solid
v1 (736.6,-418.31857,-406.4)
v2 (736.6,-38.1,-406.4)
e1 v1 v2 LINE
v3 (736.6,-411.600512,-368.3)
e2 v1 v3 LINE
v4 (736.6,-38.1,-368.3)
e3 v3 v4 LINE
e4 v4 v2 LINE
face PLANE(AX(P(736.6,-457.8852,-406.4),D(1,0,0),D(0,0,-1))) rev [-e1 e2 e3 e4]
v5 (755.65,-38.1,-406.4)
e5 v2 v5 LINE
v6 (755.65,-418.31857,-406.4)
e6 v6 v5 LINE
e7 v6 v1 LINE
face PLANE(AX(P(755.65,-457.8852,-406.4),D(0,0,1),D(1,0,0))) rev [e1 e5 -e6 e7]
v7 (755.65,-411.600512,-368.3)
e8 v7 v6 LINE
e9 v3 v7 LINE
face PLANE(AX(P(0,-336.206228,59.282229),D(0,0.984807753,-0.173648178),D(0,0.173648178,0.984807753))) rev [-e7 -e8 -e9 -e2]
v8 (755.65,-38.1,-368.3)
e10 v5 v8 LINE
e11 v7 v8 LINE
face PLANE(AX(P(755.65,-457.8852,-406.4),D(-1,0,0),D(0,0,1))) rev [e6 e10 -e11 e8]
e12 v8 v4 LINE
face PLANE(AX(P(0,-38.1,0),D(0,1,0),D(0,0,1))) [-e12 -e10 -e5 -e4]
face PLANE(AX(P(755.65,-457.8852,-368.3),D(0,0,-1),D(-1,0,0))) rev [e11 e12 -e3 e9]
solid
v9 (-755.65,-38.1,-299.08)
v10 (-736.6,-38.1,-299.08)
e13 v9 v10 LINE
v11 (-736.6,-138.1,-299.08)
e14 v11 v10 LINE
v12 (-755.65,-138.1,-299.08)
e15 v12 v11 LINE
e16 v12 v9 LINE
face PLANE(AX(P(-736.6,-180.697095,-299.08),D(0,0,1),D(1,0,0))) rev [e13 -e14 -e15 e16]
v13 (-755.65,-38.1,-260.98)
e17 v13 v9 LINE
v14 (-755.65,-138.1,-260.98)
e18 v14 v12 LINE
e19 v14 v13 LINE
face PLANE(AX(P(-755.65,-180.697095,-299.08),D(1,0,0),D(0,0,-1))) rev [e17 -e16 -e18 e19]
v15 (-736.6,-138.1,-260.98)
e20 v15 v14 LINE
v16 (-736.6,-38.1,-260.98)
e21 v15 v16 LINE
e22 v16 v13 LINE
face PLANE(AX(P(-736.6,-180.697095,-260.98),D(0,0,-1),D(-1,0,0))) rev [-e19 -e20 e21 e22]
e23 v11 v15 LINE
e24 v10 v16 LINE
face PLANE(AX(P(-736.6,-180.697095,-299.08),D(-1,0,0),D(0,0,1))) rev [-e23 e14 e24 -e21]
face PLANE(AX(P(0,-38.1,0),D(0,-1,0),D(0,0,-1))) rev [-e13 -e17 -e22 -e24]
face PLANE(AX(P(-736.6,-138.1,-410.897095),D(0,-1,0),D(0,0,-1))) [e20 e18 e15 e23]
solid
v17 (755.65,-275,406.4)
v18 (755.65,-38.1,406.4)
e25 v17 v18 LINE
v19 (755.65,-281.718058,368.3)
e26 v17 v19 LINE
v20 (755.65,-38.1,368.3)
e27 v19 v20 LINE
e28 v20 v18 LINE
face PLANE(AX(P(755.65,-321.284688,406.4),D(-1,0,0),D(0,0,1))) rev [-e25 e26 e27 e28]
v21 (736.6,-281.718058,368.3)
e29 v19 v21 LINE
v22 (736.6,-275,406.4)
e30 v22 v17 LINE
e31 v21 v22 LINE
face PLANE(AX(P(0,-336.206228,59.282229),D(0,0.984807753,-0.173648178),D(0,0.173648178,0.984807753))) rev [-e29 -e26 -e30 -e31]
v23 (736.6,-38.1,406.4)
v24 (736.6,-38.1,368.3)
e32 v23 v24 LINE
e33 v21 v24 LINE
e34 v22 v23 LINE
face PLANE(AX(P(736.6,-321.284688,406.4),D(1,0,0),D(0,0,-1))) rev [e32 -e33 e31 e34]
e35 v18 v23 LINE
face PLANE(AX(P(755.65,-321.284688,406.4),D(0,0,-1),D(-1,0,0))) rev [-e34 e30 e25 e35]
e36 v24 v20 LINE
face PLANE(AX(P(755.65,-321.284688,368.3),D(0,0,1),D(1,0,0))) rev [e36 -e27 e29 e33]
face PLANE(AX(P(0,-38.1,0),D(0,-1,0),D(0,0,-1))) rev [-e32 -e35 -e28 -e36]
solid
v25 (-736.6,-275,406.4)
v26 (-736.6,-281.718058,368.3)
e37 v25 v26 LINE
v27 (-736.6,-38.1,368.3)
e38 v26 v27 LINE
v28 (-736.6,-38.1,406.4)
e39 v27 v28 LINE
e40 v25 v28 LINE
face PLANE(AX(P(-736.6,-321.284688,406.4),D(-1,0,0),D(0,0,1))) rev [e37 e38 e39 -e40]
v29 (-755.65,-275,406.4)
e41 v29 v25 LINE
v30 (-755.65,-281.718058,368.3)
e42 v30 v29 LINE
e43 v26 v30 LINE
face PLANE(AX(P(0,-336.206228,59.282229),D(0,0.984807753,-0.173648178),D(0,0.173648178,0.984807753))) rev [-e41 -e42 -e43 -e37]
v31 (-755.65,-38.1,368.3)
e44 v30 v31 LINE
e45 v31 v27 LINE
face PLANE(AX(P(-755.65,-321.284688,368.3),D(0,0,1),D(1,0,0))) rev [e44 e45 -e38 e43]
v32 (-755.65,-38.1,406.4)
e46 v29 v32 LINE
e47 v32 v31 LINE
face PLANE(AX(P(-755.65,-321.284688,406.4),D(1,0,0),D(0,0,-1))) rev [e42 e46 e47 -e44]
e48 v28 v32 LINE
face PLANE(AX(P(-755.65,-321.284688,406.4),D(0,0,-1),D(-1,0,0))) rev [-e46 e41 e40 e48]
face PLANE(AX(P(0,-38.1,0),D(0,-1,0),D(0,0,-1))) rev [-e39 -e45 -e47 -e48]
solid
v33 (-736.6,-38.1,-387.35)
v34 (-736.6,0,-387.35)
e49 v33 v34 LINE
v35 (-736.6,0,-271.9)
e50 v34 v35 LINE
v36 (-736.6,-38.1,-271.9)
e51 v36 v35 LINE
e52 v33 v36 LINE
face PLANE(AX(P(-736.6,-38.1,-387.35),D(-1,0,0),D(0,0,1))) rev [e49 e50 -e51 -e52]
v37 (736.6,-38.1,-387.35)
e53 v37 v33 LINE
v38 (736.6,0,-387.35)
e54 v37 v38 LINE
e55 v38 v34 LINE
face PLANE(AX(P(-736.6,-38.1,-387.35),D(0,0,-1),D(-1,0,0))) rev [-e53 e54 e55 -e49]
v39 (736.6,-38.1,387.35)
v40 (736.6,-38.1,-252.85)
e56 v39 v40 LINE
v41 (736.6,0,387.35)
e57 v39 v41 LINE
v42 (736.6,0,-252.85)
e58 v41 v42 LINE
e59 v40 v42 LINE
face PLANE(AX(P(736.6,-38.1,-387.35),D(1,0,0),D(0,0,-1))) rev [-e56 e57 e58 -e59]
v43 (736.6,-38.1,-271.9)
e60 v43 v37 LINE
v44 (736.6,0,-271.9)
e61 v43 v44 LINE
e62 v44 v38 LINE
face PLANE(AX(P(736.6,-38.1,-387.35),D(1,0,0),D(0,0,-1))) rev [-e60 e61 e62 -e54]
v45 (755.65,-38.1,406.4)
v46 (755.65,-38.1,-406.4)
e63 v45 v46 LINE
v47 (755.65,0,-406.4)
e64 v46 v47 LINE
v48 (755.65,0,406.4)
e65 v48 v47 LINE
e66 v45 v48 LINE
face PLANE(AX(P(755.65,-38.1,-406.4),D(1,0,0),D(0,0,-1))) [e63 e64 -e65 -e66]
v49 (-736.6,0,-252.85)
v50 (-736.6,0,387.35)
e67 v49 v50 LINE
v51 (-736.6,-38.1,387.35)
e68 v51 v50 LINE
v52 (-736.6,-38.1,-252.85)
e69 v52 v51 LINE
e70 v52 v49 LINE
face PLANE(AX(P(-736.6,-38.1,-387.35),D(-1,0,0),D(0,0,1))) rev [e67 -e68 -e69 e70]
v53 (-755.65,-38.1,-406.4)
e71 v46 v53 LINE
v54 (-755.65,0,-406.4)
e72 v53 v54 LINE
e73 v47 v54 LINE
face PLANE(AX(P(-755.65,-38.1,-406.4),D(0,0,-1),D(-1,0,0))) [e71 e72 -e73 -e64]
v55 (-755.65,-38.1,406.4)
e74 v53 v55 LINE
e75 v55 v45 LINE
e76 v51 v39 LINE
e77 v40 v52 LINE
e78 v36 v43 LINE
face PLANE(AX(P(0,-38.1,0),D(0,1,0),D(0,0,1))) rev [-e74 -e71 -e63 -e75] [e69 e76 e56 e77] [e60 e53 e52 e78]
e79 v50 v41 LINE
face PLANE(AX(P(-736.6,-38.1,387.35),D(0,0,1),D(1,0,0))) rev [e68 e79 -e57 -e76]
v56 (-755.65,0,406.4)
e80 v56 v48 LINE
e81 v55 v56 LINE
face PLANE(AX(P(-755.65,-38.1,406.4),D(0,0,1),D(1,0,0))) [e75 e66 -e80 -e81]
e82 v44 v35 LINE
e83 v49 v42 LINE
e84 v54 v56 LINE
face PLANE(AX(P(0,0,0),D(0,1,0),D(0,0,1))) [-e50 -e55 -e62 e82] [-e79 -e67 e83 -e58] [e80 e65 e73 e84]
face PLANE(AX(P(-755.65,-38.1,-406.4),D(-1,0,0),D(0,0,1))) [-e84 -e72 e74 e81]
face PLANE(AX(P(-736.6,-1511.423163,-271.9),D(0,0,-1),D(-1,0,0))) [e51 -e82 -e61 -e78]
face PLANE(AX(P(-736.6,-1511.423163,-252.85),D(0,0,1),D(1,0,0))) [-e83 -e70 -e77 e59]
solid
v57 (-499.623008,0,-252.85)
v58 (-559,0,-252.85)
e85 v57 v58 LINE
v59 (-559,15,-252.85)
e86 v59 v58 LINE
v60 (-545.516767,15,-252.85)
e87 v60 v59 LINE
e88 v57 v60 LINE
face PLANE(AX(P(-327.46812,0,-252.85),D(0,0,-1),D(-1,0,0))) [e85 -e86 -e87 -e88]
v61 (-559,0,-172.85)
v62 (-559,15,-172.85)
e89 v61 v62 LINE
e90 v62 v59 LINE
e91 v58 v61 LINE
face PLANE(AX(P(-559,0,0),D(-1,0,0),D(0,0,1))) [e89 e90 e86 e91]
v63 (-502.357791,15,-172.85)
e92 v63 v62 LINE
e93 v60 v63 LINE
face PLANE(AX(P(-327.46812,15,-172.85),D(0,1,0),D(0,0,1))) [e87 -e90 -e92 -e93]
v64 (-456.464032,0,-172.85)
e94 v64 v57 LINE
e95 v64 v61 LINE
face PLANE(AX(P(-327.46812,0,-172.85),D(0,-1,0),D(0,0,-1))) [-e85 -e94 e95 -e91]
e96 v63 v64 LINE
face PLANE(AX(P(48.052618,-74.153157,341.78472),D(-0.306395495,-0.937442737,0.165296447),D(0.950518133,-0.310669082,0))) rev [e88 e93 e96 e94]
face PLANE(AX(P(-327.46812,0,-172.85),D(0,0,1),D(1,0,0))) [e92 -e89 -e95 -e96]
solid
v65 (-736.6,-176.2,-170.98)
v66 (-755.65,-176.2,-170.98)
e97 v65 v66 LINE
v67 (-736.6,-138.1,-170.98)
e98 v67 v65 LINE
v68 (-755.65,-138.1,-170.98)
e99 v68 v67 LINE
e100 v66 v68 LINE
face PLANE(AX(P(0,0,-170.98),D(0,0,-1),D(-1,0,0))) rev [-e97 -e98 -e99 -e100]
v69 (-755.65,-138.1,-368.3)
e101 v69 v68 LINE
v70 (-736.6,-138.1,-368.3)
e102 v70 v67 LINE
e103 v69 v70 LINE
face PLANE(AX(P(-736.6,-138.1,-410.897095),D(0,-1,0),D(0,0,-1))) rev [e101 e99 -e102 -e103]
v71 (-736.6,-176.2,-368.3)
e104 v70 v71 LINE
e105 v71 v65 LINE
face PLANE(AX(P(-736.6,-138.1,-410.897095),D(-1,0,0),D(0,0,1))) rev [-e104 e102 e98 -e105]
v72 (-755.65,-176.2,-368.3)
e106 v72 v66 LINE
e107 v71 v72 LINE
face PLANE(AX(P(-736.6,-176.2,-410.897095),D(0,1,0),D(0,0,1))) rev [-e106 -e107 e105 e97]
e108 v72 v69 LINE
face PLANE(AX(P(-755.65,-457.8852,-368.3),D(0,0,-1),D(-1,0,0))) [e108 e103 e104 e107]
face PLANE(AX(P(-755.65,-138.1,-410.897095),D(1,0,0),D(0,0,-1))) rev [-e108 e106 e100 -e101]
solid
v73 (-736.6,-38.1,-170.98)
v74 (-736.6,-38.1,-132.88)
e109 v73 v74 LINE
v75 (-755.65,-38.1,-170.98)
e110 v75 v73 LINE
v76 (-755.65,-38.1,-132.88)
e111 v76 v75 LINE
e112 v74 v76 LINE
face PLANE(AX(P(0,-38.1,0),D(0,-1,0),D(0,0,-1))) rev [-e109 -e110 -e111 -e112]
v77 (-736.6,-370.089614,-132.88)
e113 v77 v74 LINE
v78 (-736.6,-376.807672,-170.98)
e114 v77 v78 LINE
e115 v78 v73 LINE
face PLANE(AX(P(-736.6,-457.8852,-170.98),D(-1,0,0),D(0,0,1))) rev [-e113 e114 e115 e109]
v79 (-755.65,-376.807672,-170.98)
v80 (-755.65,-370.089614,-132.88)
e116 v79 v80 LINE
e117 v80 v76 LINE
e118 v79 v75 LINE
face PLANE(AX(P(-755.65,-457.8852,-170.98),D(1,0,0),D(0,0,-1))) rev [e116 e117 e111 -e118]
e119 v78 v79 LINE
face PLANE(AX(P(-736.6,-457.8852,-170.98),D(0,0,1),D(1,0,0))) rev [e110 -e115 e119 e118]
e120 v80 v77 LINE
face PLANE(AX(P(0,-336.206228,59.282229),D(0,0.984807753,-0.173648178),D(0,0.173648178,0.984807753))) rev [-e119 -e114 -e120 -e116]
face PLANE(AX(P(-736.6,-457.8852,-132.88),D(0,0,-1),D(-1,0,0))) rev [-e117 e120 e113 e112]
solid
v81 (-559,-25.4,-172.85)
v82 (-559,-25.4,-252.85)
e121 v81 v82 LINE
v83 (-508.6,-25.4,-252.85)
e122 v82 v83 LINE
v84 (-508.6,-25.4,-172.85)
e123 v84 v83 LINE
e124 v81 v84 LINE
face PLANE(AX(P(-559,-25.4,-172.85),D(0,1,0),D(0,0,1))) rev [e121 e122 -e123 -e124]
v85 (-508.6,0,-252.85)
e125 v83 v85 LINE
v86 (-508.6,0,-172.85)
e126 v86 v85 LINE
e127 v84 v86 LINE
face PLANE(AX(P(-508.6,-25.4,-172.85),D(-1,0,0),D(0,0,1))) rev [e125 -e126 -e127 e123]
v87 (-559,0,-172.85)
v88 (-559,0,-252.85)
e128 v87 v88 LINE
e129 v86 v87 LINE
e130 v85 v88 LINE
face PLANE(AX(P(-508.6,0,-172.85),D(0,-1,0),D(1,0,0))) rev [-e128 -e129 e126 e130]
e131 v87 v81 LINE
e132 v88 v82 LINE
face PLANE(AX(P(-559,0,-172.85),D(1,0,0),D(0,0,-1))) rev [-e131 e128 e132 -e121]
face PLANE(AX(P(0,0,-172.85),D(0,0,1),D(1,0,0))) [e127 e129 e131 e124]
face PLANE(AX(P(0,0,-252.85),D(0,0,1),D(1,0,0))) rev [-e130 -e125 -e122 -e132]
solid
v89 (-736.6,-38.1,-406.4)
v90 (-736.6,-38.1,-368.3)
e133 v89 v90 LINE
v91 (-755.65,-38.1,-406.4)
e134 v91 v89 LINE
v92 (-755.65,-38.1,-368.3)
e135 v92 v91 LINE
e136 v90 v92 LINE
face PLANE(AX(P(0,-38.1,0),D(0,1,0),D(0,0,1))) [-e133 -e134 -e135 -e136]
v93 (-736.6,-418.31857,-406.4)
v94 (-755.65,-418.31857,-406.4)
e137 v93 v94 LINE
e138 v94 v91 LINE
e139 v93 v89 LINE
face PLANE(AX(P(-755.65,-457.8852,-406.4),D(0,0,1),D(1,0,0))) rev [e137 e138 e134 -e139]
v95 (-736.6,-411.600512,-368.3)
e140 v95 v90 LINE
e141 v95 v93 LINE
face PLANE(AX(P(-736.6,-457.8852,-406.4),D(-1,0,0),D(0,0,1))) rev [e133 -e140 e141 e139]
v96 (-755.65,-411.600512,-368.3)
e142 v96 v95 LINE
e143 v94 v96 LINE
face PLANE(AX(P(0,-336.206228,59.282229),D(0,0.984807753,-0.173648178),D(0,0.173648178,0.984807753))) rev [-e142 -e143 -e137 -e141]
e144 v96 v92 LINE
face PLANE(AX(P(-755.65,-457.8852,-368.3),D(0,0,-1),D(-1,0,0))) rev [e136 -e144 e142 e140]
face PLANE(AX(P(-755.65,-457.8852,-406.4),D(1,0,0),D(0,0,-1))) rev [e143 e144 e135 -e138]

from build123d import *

# Parameters (mm, degrees)
SKETCH22_W          = 1511.3
SKETCH22_H          = 812.8
SKETCH22_W_2        = 1473.2
SKETCH22_H_2        = 774.7
BOSS_EXTRUDE3_DEPTH = 38.1
BOSS_EXTRUDE4_REACH = 860.848
SKETCH23_W          = 19.05
SKETCH23_H          = 38.1
BOSS_EXTRUDE5_REACH = 893.918
SKETCH24_W          = 19.05
SKETCH24_H          = 38.1
SKETCH26_W          = 1473.2
SKETCH26_H          = 19.05
BOSS_EXTRUDE6_DEPTH = 38.1
SKETCH27_W          = 19.05
SKETCH27_H          = 38.1
BOSS_EXTRUDE7_DEPTH = 197.32
SKETCH29_W          = 19.05
SKETCH29_H          = 38.1
BOSS_EXTRUDE8_DEPTH = 100
SKETCH30_W          = 50.4
SKETCH30_H          = 25.4
BOSS_EXTRUDE9_DEPTH = 80


with BuildPart() as part:
    # Sketch22 → Boss-Extrude3 (new body)
    with BuildSketch(Plane(origin=(0, 0, 0), x_dir=(1, 0, 0), z_dir=(0, 1, 0))):
        Rectangle(SKETCH22_W, SKETCH22_H)
        Rectangle(SKETCH22_W_2, SKETCH22_H_2, mode=Mode.SUBTRACT)
    extrude(amount=-BOSS_EXTRUDE3_DEPTH)

    # Sketch26 → Boss-Extrude6 (add)
    with BuildSketch(Plane(origin=(0, 0, 0), x_dir=(1, 0, 0), z_dir=(0, 1, 0))):
        with Locations((0, 262.375)):
            Rectangle(SKETCH26_W, SKETCH26_H)
    extrude(amount=-BOSS_EXTRUDE6_DEPTH)


with BuildPart() as body_2:
    # Boss-Extrude4: up to this plane
    boss_extrude4_end = Plane(origin=(0, -336.206228482, 59.282229164), z_dir=(0, 0.984807753012208, -0.17364817766693072))
    # Sketch23 → Boss-Extrude4 (new, up to the surface)
    with BuildSketch(Plane.XZ.offset(38.1), mode=Mode.PRIVATE) as boss_extrude4_sk1:
        with Locations((-746.125, 387.35)):
            Rectangle(SKETCH23_W, SKETCH23_H)
    boss_extrude4_tool1 = split(extrude(boss_extrude4_sk1.sketch, amount=BOSS_EXTRUDE4_REACH, mode=Mode.PRIVATE), bisect_by=boss_extrude4_end, keep=Keep.BOTH, mode=Mode.PRIVATE)
    add(boss_extrude4_tool1.solids().sort_by_distance((-746.125, -38.1, 387.35))[0])
    # Sketch23 → Boss-Extrude4 (new, up to the surface)
    with BuildSketch(Plane.XZ.offset(38.1), mode=Mode.PRIVATE) as boss_extrude4_sk2:
        with Locations((746.125, 387.35)):
            Rectangle(SKETCH23_W, SKETCH23_H)
    boss_extrude4_tool2 = split(extrude(boss_extrude4_sk2.sketch, amount=BOSS_EXTRUDE4_REACH, mode=Mode.PRIVATE), bisect_by=boss_extrude4_end, keep=Keep.BOTH, mode=Mode.PRIVATE)
    add(boss_extrude4_tool2.solids().sort_by_distance((746.125, -38.1, 387.35))[0])


with BuildPart() as body_3:
    # Boss-Extrude5: up to this plane
    boss_extrude5_end = Plane(origin=(0, -336.206228482, 59.282229164), z_dir=(0, 0.984807753012208, -0.17364817766693072))
    # Sketch24 → Boss-Extrude5 (new, up to the surface)
    with BuildSketch(Plane.XZ.offset(38.1), mode=Mode.PRIVATE) as boss_extrude5_sk1:
        with Locations((-746.125, -387.35)):
            Rectangle(SKETCH24_W, SKETCH24_H)
    boss_extrude5_tool1 = split(extrude(boss_extrude5_sk1.sketch, amount=BOSS_EXTRUDE5_REACH, mode=Mode.PRIVATE), bisect_by=boss_extrude5_end, keep=Keep.BOTH, mode=Mode.PRIVATE)
    add(boss_extrude5_tool1.solids().sort_by_distance((-746.125, -38.1, -387.35))[0])
    # Sketch24 → Boss-Extrude5 (new, up to the surface)
    with BuildSketch(Plane.XZ.offset(38.1), mode=Mode.PRIVATE) as boss_extrude5_sk2:
        with Locations((746.125, -387.35)):
            Rectangle(SKETCH24_W, SKETCH24_H)
    boss_extrude5_tool2 = split(extrude(boss_extrude5_sk2.sketch, amount=BOSS_EXTRUDE5_REACH, mode=Mode.PRIVATE), bisect_by=boss_extrude5_end, keep=Keep.BOTH, mode=Mode.PRIVATE)
    add(boss_extrude5_tool2.solids().sort_by_distance((746.125, -38.1, -387.35))[0])
    # Sketch24 → Boss-Extrude5 (new, up to the surface)
    with BuildSketch(Plane.XZ.offset(38.1), mode=Mode.PRIVATE) as boss_extrude5_sk3:
        with Locations((-746.125, -151.93)):
            Rectangle(SKETCH24_W, SKETCH24_H)
    boss_extrude5_tool3 = split(extrude(boss_extrude5_sk3.sketch, amount=BOSS_EXTRUDE5_REACH, mode=Mode.PRIVATE), bisect_by=boss_extrude5_end, keep=Keep.BOTH, mode=Mode.PRIVATE)
    add(boss_extrude5_tool3.solids().sort_by_distance((-746.125, -38.1, -151.93))[0])


with BuildPart() as body_4:
    # Sketch27 → Boss-Extrude7 (new body)
    with BuildSketch(Plane(origin=(0, 0, -170.98), x_dir=(-1, 0, 0), z_dir=(0, 0, -1))):
        with Locations((746.125, -157.15)):
            Rectangle(SKETCH27_W, SKETCH27_H)
    extrude(amount=BOSS_EXTRUDE7_DEPTH)


with BuildPart() as body_5:
    # Sketch29 → Boss-Extrude8 (new body)
    with BuildSketch(Plane.XZ.offset(38.1)):
        with Locations((-746.125, -280.03)):
            Rectangle(SKETCH29_W, SKETCH29_H)
    extrude(amount=BOSS_EXTRUDE8_DEPTH)


with BuildPart() as body_6:
    # Sketch30 → Boss-Extrude9 (new body)
    with BuildSketch(Plane.XY.offset(-252.85)):
        with Locations((-533.8, -12.7)):
            Rectangle(SKETCH30_W, SKETCH30_H)
    extrude(amount=BOSS_EXTRUDE9_DEPTH)


with BuildPart() as body_7:
    # Boss-Extrude11: read off the stored shape, not the designer's step
    # Boss-Extrude11: loft between two sections, ruled curve by curve
    boss_extrude11_from = [
        Edge.make_line((-499.623008206, 0, -252.85), (-559, 0, -252.85)),
        Edge.make_line((-545.516767314, 15, -252.85), (-559, 15, -252.85)),
        Edge.make_line((-559, 15, -252.85), (-559, 0, -252.85)),
        Edge.make_line((-499.623008206, 0, -252.85), (-545.516767314, 15, -252.85)),
    ]
    boss_extrude11_to = [
        Edge.make_line((-456.46403233, 0, -172.85), (-559, 0, -172.85)),
        Edge.make_line((-502.357791437, 15, -172.85), (-559, 15, -172.85)),
        Edge.make_line((-559, 15, -172.85), (-559, 0, -172.85)),
        Edge.make_line((-456.46403233, 0, -172.85), (-502.357791437, 15, -172.85)),
    ]
    boss_extrude11 = Solid(Shell([*[Face.make_surface_from_curves(boss_extrude11_from[k], boss_extrude11_to[k]) for k in range(4)], Face(Wire(boss_extrude11_from)), Face(Wire(boss_extrude11_to))]))
    add(boss_extrude11)


solid = Compound([part.part, body_2.part, body_3.part, body_4.part, body_5.part, body_6.part, body_7.part])
